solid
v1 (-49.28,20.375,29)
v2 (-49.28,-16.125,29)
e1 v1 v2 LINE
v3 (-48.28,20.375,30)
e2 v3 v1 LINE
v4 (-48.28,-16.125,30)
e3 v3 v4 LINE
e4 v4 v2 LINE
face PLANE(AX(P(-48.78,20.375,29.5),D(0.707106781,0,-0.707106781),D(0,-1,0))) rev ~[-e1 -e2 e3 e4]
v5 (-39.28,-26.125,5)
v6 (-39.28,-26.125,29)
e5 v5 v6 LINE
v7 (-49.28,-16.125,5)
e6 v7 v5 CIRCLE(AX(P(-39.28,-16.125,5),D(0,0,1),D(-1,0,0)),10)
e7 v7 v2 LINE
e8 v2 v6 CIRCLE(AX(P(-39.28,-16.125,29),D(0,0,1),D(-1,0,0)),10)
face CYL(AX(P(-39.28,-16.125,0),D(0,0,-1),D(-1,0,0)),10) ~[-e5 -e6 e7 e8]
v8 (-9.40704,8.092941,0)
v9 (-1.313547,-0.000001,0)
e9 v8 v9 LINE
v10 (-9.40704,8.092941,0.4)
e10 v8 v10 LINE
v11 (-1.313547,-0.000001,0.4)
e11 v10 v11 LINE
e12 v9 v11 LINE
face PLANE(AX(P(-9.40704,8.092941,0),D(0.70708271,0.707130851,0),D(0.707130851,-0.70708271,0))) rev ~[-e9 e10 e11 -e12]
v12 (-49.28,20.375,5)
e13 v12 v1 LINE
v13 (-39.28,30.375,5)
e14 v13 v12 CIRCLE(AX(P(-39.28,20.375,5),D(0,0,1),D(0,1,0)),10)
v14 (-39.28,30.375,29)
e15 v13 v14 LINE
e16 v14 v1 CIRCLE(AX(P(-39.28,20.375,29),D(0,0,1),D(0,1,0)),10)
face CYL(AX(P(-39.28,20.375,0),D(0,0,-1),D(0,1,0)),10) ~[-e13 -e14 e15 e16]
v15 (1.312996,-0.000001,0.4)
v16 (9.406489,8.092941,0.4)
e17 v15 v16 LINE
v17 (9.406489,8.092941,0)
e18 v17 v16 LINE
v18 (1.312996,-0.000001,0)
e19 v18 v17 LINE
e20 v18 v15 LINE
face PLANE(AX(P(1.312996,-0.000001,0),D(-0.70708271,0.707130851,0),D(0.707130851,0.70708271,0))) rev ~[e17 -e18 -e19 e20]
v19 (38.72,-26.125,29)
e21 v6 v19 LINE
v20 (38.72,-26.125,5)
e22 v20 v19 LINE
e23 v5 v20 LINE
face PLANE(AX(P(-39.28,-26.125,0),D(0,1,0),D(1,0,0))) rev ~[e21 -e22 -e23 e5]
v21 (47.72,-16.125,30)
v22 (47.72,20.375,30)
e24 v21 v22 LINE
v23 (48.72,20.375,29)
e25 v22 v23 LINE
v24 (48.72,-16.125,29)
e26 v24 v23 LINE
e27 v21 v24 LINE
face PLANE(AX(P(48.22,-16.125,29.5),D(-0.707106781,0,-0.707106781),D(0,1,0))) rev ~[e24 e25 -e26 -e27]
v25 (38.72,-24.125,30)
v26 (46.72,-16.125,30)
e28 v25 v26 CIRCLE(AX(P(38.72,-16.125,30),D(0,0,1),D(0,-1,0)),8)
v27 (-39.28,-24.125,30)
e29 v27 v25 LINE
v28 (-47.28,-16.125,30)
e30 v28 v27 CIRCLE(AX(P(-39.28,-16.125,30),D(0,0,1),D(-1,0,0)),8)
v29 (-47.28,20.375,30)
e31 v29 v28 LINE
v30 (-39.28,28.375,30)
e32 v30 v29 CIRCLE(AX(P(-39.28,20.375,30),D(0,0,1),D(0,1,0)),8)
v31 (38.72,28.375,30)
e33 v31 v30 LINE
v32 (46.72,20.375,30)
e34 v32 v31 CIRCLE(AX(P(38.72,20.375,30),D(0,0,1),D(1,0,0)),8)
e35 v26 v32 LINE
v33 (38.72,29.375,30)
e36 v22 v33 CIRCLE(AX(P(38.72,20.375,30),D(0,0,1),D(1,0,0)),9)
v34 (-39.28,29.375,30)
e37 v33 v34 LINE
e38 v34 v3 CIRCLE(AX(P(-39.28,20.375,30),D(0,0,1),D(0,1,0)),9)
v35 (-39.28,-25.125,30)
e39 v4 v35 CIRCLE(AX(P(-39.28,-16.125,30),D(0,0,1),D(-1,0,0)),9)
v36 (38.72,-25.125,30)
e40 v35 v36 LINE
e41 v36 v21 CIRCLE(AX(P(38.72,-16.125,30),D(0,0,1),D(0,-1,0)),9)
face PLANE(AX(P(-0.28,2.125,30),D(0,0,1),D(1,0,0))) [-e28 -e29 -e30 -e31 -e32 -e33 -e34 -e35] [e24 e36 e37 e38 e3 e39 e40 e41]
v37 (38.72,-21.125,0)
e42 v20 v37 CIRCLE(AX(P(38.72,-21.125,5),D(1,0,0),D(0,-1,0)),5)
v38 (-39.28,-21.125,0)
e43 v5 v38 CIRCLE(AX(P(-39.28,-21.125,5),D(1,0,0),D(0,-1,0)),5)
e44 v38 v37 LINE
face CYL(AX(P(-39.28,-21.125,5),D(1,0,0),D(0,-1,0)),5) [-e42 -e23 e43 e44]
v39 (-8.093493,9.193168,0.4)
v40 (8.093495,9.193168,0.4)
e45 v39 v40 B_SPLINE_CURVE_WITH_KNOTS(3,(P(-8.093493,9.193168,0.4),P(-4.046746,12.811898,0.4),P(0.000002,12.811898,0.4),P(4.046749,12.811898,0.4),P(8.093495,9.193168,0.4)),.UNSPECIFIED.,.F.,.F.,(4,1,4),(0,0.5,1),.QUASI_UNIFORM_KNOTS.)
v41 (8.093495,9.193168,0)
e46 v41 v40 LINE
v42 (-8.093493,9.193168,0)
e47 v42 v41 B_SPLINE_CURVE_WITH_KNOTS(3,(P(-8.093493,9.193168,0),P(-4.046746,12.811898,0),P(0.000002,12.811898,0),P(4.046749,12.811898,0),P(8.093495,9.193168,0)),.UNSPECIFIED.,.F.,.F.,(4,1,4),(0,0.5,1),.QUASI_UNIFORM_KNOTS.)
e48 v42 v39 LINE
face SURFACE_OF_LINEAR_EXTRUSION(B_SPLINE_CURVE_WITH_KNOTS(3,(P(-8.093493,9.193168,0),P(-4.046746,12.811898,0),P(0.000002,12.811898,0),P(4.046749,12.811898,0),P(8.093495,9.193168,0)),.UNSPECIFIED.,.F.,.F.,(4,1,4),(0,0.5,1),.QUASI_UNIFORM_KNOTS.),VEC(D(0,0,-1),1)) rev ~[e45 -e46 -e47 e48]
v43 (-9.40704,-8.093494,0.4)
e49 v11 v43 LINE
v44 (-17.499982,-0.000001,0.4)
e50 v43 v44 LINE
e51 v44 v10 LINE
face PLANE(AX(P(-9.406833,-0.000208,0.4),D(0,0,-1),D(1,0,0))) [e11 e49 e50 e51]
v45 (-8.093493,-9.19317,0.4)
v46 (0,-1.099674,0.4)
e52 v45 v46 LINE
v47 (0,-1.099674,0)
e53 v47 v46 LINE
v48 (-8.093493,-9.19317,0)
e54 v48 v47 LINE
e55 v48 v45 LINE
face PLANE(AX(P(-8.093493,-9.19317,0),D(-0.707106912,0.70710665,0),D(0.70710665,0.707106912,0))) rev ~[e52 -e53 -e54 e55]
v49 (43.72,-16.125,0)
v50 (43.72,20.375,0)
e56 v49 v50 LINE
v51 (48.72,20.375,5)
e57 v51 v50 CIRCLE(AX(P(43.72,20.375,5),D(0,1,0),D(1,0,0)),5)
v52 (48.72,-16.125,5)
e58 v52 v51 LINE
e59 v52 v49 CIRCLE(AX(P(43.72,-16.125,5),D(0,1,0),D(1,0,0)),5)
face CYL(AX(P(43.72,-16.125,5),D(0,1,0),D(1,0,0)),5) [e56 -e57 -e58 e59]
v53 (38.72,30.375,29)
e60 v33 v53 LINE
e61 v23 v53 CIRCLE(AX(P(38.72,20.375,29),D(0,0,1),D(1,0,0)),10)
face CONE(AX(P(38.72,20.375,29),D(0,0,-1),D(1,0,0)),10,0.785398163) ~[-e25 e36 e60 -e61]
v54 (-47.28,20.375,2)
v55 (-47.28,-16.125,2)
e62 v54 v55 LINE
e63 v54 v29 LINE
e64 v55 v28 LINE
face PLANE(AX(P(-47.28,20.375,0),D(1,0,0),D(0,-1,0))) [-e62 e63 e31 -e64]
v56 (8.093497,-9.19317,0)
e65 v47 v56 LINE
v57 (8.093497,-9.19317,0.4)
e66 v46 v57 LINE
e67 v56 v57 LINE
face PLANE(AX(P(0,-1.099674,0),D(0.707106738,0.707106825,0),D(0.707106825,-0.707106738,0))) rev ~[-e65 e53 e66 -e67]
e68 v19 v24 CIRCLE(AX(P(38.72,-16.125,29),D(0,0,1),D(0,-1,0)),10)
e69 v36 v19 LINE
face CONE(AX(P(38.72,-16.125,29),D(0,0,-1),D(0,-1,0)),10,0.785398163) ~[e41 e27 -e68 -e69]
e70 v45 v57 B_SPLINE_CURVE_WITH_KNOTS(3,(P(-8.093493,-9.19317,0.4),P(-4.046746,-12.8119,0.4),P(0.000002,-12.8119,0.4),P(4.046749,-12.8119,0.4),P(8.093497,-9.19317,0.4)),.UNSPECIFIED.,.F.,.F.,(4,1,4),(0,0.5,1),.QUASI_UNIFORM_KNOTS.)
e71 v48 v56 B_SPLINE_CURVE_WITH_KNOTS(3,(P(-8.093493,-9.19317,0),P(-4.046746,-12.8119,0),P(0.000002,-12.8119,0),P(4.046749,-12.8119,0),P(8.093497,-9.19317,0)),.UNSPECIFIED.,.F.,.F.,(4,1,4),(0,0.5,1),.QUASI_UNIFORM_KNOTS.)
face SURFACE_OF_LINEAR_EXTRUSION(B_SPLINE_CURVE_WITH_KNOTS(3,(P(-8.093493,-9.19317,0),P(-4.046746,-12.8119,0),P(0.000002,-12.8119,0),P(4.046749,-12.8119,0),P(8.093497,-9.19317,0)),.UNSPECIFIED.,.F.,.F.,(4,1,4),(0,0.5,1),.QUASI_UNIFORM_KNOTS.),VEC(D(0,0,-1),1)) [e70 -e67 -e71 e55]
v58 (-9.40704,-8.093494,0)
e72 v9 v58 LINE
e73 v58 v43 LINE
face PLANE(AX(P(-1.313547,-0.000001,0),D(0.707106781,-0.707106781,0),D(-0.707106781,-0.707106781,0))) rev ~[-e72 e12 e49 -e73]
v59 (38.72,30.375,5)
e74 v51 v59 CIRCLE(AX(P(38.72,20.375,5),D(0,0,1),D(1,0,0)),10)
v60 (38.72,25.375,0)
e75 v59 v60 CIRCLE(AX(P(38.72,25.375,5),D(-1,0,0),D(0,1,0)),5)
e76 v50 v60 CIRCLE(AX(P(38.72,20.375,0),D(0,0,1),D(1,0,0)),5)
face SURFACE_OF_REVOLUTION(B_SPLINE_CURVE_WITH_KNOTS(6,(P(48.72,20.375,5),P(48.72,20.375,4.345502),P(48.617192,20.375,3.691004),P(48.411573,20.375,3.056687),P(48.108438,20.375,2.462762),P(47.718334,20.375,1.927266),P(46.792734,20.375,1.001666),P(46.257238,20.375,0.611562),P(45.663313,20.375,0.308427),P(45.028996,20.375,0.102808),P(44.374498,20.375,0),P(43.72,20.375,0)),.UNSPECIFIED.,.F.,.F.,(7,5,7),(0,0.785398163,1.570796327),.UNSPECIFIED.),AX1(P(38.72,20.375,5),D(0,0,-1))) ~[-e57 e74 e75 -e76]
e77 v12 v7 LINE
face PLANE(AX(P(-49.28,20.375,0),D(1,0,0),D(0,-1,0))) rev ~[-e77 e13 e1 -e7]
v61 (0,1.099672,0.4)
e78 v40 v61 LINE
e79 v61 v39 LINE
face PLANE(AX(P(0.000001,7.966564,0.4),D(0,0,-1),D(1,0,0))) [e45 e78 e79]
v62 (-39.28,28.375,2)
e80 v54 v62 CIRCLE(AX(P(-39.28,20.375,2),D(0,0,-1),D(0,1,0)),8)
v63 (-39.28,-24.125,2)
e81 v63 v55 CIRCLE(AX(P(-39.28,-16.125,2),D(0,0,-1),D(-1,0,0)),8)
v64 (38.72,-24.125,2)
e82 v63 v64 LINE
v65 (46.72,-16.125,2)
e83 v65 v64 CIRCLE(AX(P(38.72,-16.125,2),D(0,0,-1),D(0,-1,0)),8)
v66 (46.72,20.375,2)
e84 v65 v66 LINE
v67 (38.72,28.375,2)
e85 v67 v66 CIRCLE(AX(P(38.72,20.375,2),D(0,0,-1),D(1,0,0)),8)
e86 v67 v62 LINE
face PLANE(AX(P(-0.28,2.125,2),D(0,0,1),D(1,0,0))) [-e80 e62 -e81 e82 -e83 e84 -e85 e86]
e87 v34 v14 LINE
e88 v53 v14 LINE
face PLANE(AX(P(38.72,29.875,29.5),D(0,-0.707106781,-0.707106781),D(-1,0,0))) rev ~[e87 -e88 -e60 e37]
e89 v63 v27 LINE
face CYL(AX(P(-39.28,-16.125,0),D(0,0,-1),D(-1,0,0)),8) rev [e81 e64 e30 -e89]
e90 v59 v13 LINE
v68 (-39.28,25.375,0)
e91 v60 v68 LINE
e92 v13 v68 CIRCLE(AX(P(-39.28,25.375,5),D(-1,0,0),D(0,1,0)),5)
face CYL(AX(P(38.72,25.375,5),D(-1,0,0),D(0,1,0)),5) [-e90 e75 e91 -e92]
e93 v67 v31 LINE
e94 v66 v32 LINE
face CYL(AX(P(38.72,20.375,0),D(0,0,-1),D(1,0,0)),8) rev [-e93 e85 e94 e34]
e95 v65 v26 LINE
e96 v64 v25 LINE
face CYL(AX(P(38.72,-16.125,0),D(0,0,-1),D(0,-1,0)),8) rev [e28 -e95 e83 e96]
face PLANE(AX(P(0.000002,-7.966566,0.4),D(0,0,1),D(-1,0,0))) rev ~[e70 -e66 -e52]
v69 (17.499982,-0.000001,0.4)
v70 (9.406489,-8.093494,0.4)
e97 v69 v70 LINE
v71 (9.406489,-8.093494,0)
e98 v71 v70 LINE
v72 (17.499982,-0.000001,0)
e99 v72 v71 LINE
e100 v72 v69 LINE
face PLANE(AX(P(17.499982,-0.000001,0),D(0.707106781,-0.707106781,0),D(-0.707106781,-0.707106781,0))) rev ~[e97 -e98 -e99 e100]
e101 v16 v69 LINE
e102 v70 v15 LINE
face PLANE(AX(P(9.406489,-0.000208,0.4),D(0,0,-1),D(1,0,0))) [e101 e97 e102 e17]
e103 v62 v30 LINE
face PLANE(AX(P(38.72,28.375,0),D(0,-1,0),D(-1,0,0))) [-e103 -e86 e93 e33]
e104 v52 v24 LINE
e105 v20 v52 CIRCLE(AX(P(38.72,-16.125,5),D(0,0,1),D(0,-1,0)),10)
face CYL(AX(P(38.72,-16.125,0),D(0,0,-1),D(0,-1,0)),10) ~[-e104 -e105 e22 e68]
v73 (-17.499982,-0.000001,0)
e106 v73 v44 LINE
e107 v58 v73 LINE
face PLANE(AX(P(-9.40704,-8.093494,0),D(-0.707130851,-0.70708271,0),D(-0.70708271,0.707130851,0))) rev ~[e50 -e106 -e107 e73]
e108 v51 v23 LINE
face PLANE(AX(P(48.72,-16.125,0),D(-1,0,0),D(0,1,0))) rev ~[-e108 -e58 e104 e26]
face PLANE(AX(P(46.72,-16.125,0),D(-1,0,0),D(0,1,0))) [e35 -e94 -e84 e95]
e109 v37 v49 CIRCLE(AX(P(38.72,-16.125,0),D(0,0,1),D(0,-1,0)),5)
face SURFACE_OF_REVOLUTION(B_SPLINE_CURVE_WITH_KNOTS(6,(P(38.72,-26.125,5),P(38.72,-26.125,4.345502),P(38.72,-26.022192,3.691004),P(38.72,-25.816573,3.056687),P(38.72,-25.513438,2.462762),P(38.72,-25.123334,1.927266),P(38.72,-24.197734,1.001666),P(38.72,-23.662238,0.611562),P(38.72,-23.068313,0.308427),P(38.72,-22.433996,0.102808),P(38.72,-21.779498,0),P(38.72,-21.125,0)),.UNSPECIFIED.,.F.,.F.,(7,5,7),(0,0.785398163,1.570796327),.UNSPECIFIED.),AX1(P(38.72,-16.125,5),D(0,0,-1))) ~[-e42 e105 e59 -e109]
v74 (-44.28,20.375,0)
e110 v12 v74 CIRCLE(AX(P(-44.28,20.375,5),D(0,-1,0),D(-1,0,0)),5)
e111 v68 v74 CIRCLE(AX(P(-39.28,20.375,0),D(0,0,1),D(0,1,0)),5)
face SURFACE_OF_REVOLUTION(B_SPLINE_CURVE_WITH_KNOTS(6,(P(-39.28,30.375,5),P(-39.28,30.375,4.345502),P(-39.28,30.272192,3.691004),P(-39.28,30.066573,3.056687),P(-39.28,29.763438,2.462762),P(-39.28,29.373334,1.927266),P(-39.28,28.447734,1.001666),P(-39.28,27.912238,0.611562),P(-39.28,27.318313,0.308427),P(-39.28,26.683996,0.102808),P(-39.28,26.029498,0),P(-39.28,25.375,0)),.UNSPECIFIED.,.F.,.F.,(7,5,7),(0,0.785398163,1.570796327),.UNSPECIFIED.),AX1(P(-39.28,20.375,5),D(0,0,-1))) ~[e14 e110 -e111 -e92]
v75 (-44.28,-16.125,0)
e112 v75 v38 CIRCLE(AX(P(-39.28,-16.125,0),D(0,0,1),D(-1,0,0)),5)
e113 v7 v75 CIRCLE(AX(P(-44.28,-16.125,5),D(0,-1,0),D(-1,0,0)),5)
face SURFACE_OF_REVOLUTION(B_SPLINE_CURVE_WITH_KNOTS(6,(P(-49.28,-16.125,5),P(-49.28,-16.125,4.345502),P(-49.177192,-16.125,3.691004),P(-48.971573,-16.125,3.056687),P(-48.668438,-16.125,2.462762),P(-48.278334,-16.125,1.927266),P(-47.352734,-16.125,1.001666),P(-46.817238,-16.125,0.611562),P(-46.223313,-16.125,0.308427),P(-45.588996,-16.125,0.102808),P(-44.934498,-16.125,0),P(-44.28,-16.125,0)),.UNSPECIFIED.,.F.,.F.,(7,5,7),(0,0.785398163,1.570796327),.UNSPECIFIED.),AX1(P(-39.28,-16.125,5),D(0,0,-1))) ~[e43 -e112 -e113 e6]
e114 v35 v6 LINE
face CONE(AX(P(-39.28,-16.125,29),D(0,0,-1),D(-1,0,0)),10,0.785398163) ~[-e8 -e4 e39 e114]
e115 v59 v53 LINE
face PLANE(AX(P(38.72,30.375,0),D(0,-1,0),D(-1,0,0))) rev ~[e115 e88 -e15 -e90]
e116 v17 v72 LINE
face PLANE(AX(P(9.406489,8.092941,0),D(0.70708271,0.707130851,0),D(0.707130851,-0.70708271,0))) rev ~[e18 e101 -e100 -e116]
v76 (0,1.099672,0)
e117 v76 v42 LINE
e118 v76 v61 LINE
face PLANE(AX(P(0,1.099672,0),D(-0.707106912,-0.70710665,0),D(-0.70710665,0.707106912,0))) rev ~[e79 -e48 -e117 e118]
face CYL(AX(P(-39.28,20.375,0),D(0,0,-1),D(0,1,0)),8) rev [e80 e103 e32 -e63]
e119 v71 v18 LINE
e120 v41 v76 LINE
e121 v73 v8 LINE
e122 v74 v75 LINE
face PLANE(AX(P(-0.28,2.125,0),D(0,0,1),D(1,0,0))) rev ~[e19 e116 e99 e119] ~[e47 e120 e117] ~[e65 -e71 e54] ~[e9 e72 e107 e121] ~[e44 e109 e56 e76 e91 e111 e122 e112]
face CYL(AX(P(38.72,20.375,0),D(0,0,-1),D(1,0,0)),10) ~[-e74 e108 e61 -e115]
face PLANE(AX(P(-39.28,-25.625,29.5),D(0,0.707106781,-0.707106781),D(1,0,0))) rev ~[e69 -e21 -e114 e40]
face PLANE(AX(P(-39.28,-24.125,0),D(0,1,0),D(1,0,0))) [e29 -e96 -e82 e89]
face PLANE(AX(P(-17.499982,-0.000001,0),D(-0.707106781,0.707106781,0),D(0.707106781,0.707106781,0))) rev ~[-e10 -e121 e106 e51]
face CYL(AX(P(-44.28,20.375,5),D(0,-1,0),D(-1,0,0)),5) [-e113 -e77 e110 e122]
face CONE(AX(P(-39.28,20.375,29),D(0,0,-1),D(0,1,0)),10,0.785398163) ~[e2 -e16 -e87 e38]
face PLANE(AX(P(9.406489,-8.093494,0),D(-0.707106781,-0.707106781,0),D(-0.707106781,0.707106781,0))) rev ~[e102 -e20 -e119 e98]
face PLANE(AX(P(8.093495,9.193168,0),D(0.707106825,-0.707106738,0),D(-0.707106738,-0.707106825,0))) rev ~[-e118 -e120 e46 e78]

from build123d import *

# Parameters (mm, degrees)
F1_DEPTH = 30
F2_T     = -2
F3_R     = 5
F4_SIZE  = 1
F6_DEPTH = 0.4


# Not quite as in the source:
# - ends of sketch curves that miss each other by under 0.0002 mm in the source are joined


with BuildPart() as f1:
    # F0 (on Top) → F1 (new body)
    with BuildSketch(Plane.XY):
        with BuildLine():
            Line((38.72, 30.375), (-39.28, 30.375))
            ThreePointArc((-39.28, 30.375), (-46.3510678119, 27.4460678119), (-49.28, 20.375))
            Line((-49.28, 20.375), (-49.28, -16.125))
            ThreePointArc((-49.28, -16.125), (-46.3510678119, -23.1960678119), (-39.28, -26.125))
            Line((-39.28, -26.125), (38.72, -26.125))
            ThreePointArc((38.72, -26.125), (45.7910678119, -23.1960678119), (48.72, -16.125))
            Line((48.72, -16.125), (48.72, 20.375))
            ThreePointArc((48.72, 20.375), (45.7910678119, 27.4460678119), (38.72, 30.375))
        make_face()
    extrude(amount=F1_DEPTH)

    # F2
    f2_openings = [f1.faces().sort_by_distance(p)[0] for p in [
        (-0.28, 2.125, 30),
    ]]
    offset(amount=F2_T, openings=f2_openings)

    # F3
    f3_edges = [f1.edges().sort_by_distance(p)[0] for p in [
        (-0.28, -26.125, 0),
    ]]
    fillet(f3_edges, radius=F3_R)

    # F4
    f4_edges = [f1.edges().sort_by_distance(p)[0] for p in [
        (-0.28, -26.125, 30),
        (-46.351068, -23.196068, 30),
        (-49.28, 2.125, 30),
        (-46.351068, 27.446068, 30),
        (-0.28, 30.375, 30),
        (45.791068, 27.446068, 30),
        (48.72, 2.125, 30),
        (45.791068, -23.196068, 30),
    ]]
    chamfer(f4_edges, length=F4_SIZE)

    # F5 (on face) → F6 (cut)
    with BuildSketch(Plane(origin=(0, 0, 0), x_dir=(1, 0, 0), z_dir=(0, 0, -1))):
        with BuildLine():
            add(Edge.make_bspline(
                [(-8.093493, 9.19317), (-4.0467455, 12.8119), (2e-06, 12.8119), (4.0467495, 12.8119), (8.093497, 9.19317)],
                knots=[0, 0, 0, 0, 0.5, 1, 1, 1, 1], degree=3))
            Line((-8.093493, 9.19317), (0, 1.099674))
            Line((0, 1.099674), (8.093497, 9.19317))
        make_face()
        Polygon((-1.313547, 1e-06), (-9.40704, 8.093494), (-17.499982, 1e-06), (-9.40704, -8.092941), align=None)
        Polygon((17.499982, 1e-06), (9.406489, 8.093494), (1.312996, 1e-06), (9.406489, -8.092941), align=None)
        with BuildLine():
            Line((8.093495, -9.193168), (0, -1.099672))
            Line((0, -1.099672), (-8.093493, -9.193168))
            add(Edge.make_bspline(
                [(-8.093493, -9.193168), (-4.0467455, -12.811898), (2e-06, -12.811898), (4.0467495, -12.811898), (8.093495, -9.193168)],
                knots=[0, 0, 0, 0, 0.5, 1, 1, 1, 1], degree=3))
        make_face()
    extrude(amount=-F6_DEPTH, mode=Mode.SUBTRACT)


solid = f1.part
